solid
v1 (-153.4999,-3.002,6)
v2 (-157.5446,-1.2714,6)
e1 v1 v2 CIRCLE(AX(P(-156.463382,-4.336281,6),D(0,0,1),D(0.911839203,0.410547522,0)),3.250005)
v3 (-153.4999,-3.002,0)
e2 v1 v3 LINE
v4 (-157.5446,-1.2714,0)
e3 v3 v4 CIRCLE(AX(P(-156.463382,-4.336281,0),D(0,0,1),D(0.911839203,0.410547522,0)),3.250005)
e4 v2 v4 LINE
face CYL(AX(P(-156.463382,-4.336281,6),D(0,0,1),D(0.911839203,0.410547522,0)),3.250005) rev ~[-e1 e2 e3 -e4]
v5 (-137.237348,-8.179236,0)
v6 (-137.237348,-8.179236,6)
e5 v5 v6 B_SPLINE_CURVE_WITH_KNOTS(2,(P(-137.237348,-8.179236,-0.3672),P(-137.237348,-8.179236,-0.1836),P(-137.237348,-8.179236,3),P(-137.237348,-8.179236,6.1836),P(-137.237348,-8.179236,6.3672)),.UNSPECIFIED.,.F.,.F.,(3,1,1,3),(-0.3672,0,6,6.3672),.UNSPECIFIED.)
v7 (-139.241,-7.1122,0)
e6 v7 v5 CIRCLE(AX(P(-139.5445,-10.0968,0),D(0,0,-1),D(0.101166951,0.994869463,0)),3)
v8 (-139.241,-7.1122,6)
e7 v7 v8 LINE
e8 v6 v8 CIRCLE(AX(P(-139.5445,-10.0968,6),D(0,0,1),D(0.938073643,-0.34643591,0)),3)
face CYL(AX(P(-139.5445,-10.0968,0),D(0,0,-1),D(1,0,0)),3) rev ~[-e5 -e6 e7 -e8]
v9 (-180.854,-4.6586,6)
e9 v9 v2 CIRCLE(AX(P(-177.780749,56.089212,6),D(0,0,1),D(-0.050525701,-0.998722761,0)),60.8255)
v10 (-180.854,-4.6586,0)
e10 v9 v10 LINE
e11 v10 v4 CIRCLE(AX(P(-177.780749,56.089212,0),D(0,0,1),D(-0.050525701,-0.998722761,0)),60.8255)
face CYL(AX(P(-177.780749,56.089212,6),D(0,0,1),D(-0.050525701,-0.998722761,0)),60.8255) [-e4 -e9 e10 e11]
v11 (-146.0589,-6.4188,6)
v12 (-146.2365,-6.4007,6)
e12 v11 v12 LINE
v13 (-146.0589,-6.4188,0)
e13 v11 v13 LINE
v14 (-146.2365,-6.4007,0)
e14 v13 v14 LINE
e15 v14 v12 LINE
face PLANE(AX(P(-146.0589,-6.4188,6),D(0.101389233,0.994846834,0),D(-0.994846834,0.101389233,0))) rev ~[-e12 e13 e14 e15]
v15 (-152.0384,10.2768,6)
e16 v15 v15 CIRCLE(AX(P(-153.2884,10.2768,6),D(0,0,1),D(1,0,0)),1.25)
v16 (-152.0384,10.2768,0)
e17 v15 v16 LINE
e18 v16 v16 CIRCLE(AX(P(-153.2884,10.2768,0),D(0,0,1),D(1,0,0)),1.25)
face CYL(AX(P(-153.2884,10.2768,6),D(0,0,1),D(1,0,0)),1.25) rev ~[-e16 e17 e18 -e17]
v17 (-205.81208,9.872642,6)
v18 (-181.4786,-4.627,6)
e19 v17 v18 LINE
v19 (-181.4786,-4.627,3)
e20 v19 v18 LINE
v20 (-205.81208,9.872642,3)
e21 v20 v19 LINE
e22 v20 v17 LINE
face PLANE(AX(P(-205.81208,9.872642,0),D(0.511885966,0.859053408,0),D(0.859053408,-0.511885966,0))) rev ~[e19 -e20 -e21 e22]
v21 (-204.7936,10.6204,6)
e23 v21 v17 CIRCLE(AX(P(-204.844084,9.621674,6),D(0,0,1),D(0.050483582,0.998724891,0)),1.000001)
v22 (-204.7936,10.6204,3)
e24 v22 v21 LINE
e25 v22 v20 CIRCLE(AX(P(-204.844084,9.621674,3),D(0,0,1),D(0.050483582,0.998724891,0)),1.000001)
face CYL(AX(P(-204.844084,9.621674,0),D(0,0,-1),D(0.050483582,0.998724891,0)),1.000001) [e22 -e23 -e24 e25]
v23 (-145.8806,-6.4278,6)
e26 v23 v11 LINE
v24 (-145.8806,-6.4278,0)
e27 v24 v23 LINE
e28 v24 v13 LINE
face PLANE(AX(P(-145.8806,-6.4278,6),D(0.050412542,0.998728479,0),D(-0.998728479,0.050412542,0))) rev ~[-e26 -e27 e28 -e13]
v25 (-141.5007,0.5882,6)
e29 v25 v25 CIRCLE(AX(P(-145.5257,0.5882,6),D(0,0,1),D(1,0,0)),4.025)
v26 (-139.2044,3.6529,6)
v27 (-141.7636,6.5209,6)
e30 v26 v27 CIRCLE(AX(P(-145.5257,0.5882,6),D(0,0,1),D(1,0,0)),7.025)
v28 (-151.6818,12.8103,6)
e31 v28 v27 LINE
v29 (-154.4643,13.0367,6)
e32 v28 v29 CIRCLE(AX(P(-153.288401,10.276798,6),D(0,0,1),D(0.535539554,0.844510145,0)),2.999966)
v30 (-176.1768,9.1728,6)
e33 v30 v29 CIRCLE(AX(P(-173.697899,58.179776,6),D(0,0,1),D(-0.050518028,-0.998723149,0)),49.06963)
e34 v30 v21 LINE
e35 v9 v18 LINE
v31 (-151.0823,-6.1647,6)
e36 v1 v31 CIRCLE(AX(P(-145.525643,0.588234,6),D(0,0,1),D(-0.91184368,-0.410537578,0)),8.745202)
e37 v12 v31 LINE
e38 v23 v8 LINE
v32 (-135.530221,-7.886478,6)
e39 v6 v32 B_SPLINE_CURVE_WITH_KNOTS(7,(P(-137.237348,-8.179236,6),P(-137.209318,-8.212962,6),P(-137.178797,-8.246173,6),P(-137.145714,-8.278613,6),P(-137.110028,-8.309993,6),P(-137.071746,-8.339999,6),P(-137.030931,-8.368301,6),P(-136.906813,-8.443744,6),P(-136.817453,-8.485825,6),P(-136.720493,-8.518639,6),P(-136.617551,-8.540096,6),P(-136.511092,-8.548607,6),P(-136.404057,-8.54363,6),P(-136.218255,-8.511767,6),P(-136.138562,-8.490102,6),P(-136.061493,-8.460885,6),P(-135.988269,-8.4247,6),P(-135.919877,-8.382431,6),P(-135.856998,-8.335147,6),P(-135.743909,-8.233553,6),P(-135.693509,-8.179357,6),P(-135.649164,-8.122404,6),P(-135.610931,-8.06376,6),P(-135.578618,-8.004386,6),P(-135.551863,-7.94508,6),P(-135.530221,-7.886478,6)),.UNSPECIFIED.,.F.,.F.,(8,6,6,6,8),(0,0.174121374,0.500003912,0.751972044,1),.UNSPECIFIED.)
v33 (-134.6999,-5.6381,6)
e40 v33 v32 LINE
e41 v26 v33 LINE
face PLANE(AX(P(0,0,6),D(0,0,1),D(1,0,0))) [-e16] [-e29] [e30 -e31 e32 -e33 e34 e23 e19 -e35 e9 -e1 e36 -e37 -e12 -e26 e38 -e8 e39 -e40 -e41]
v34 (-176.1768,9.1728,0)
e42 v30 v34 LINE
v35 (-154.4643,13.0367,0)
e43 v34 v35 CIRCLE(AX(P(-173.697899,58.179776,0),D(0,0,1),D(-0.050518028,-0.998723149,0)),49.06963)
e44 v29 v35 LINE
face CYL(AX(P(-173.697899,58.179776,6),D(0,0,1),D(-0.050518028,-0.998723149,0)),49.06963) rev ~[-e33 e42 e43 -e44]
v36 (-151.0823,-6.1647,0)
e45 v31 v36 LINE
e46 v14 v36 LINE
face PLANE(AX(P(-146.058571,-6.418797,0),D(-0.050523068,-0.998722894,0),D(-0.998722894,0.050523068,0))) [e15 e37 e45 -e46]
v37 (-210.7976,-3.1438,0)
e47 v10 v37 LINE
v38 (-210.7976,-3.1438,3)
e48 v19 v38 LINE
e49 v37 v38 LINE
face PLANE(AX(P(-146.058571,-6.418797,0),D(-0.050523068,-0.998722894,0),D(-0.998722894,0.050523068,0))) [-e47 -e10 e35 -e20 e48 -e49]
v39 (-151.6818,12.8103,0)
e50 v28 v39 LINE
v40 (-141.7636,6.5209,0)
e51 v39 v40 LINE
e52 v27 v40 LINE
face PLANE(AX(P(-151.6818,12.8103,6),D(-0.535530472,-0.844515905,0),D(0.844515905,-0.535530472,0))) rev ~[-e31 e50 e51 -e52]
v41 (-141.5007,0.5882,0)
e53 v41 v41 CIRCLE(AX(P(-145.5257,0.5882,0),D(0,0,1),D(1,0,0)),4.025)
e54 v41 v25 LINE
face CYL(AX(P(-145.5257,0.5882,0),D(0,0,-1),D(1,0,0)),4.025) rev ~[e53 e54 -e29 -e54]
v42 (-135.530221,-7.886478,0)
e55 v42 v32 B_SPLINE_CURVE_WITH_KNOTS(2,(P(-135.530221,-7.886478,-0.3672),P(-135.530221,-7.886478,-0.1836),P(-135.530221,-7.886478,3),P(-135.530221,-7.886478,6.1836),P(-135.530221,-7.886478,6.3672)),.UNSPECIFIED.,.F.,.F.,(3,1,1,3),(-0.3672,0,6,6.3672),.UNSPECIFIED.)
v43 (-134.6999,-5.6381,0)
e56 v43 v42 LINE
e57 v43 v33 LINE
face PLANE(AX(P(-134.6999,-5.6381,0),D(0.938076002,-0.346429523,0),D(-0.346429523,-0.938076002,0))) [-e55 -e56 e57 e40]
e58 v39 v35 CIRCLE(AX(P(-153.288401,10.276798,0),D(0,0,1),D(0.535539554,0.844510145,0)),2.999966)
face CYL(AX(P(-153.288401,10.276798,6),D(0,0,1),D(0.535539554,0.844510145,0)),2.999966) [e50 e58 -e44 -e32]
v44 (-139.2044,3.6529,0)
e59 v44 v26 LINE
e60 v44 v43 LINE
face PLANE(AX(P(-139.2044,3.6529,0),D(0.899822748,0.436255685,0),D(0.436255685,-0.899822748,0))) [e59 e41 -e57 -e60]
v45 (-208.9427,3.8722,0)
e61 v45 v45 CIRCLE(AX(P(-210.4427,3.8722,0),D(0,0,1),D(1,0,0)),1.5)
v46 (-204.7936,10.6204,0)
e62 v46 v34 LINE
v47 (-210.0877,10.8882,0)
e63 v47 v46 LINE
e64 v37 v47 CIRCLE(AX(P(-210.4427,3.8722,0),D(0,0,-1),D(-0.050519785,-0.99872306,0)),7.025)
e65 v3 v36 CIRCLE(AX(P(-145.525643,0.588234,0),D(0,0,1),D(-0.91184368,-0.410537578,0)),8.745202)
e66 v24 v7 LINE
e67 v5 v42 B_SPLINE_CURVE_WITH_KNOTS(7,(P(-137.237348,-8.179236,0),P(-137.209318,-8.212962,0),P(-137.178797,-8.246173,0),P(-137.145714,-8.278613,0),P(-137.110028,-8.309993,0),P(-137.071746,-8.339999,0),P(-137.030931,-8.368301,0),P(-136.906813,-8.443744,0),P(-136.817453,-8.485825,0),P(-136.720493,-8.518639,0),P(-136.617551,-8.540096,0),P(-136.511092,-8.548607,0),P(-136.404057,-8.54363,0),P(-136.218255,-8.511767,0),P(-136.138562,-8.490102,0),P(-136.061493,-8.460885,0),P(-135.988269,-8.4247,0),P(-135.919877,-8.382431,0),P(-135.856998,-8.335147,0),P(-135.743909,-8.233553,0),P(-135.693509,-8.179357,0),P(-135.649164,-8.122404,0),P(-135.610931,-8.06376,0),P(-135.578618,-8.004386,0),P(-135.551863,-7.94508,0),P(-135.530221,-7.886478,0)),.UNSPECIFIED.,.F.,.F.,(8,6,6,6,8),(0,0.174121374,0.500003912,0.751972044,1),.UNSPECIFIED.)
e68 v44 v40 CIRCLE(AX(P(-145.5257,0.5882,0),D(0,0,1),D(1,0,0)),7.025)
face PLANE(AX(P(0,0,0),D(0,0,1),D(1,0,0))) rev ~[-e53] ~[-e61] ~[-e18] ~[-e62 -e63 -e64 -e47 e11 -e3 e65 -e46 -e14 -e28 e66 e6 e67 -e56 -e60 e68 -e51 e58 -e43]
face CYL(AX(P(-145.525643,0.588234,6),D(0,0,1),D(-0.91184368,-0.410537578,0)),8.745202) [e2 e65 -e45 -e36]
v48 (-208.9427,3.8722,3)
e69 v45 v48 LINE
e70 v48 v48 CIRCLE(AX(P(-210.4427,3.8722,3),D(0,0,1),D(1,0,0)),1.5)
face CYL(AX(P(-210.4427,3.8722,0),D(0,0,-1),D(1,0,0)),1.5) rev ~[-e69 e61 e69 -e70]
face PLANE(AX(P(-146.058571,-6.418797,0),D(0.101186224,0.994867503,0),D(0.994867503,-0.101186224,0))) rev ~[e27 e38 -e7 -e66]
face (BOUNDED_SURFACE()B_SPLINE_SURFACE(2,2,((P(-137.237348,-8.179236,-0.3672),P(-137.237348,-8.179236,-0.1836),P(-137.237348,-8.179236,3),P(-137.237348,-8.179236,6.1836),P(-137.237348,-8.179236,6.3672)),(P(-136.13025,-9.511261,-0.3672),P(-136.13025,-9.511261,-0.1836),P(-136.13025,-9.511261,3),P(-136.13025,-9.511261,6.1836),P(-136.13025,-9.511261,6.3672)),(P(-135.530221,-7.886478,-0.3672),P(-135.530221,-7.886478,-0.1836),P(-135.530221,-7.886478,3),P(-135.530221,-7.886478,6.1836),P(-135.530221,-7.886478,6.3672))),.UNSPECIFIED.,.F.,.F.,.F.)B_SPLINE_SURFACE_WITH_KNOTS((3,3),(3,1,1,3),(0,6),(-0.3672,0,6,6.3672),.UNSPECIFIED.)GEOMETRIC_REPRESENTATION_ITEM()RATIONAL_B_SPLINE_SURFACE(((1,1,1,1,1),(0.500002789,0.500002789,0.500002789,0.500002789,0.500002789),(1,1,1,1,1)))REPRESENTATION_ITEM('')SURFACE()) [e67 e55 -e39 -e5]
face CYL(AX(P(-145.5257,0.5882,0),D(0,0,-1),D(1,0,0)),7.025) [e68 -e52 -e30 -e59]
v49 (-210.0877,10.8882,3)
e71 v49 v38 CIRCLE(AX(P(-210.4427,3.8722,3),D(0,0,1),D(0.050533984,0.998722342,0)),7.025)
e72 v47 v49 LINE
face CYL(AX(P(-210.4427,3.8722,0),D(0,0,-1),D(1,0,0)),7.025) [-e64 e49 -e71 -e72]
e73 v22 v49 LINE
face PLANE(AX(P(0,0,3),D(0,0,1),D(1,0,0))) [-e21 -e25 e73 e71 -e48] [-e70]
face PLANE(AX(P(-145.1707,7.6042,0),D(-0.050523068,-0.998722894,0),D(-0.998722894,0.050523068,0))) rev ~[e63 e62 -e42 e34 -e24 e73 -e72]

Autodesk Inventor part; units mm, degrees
ref_plane "YZ Plane" through (0, 0, 0) normal (1, 0, 0) x (0, 1, 0)
ref_plane "XZ Plane" through (0, 0, 0) normal (0, 1, 0) x (-1, 0, 0)
ref_plane "XY Plane" through (0, 0, 0) normal (0, 0, 1) x (1, 0, 0)
sketch "スケッチ1" plane through (0, 0, 0) normal (0, 0, 1) x (1, 0, 0)
  circle A0 centre (-145.5257, 0.5882) radius 1.5
  circle A1 centre (-139.5445, -10.0968) radius 1.5
  circle A2 centre (-105.5257, -16.4118) radius 30.1 construction
  line L0 (-170.915, -81.4118) -> (490.0044, -81.4118)
  circle A3 centre (-145.5257, 0.5882) radius 4.025
  circle A4 centre (-139.5445, -10.0968) radius 3
  circle A5 centre (-145.5257, 0.5882) radius 7.025
  line L1 (-146.2365, -6.4007) -> (-139.241, -7.1122)
  line L2 (-139.2044, 3.6529) -> (-134.6999, -5.6381)
  line L3 (-134.6999, -5.6381) -> (-136.7303, -11.1361)
  circle A6 centre (-105.5257, -16.4118) radius 31.1 construction
  line L4 (-145.1707, 7.6042) -> (-210.0877, 10.8882)
  line L5 (-145.8806, -6.4278) -> (-210.7976, -3.1438)
  circle A7 centre (-210.4427, 3.8722) radius 1.5
  circle A8 centre (-210.4427, 3.8722) radius 4.025
  circle A9 centre (-210.4427, 3.8722) radius 7.025
  circle A10 centre (-210.4427, 3.8722) radius 7.525
  line L6 (-206.5907, 10.3366) -> (-181.4786, -4.627)
  circle A11 centre (-199.4194, 13.3524) radius 1.25
  arc A12 (-199.5709, 10.3562) -> (-202.1936, 14.494) centre (-199.4194, 13.3524) ccw
  line L7 (-202.1936, 14.494) -> (-247.2482, 16.7732)
  arc A13 (-289.8377, 39.1951) -> (-247.2482, 16.7732) centre (-244.3571, 73.9244) ccw
  arc A14 (-289.8377, 39.1951) -> (-291.5649, 38.2266) centre (-290.6325, 38.5882) ccw
  arc A15 (-291.5649, 38.2266) -> (-251.8636, 4.9117) centre (-241.4172, 57.674) ccw
  line L8 (-251.8636, 4.9117) -> (-211.807, -3.019)
  line L9 (-209.3045, 11.3106) -> (-204.7936, 10.6204)
  arc A16 (-204.7936, 10.6204) -> (-205.5417, 8.9052) centre (-204.8441, 9.6217) ccw
  line L10 (-210.5022, 11.397) -> (-238.3358, 2.2334)
  point P0 (0, 0)
  point P1 (0, 0)
  point P2 (-146.0589, -6.4188)
  point P3 (-205.8121, 9.8726)
  dimension "d0" = 6
  dimension "d1" = 8.05
  dimension "d2" = 3
  dimension "d3" = 1
  dimension "d4" = 3
  dimension "d5" = 8.05
  dimension "d6" = 3
  dimension "d7" = 0.5
  dimension "d8" = 2.5
  dimension "d9" = 6
  dimension "d10" = 2
  dimension "d11" = 120
  dimension "d12" = 4
  dimension "d13" = 150
  dimension "d14" = 1
  dimension "d15" = 65
  dimension "d16" = 87.382
extrude "押し出し1" add sketch "スケッチ1" along normal blind 6 contours A4 L1 L5 A5 L2 L3 | L5 L6 A16 L4 A5 L1 | A5
extrude "押し出し2" add sketch "スケッチ1" along normal blind 3 contours L5 A10 A16 L6 | L5 A9 A16 A10 | A16 A10 L6 | L6 A10 L4 A16 | A9 | A10 A16 A9 L4 | A8
fillet "フィレット1" radius 1 1 edges at (-136.7303, -11.1361, 3)
sketch "スケッチ2" plane through (0, 0, 6) normal (0, 0, 1) x (1, 0, 0)
  line L0 (-210.7976, -3.1438) -> (-181.4786, -4.627) projected
  line L1 (-205.8121, 9.8726) -> (-181.4786, -4.627) projected
  arc A0 (-204.7936, 10.6204) -> (-205.8121, 9.8726) centre (-204.8441, 9.6217) ccw projected
  line L2 (-204.7936, 10.6204) -> (-210.0877, 10.8882) projected
  arc A1 (-210.0877, 10.8882) -> (-210.7976, -3.1438) centre (-210.4427, 3.8722) ccw projected
  circle A2 centre (-210.4427, 3.8722) radius 1.5 projected
  arc A3 (-137.2374, -8.1793) -> (-135.5302, -7.8865) centre (-136.4683, -7.5401) ccw projected
  line L3 (-135.5302, -7.8865) -> (-134.6999, -5.6381) projected
  line L4 (-134.6999, -5.6381) -> (-139.2044, 3.6529) projected
  arc A4 (-139.2044, 3.6529) -> (-145.1707, 7.6042) centre (-145.5257, 0.5882) ccw projected
  line L5 (-145.1707, 7.6042) -> (-204.7936, 10.6204) projected
  arc A5 (-204.7936, 10.6204) -> (-205.8121, 9.8726) centre (-204.8441, 9.6217) ccw projected
  line L6 (-205.8121, 9.8726) -> (-181.4786, -4.627) projected
  line L7 (-181.4786, -4.627) -> (-146.0589, -6.4188) projected
  line L8 (-146.0589, -6.4188) -> (-146.2365, -6.4007) projected
  arc A6 (-146.2365, -6.4007) -> (-145.8806, -6.4278) centre (-145.5257, 0.5882) ccw projected
  line L9 (-145.8806, -6.4278) -> (-146.0589, -6.4188) projected
  line L10 (-146.0589, -6.4188) -> (-139.241, -7.1122) projected
  arc A7 (-137.2374, -8.1793) -> (-139.241, -7.1122) centre (-139.5445, -10.0968) ccw projected
  circle A8 centre (-145.5257, 0.5882) radius 4.025 projected
  arc A9 (-204.7936, 10.6204) -> (-205.8121, 9.8726) centre (-204.8441, 9.6217) ccw projected
  line L11 (-204.6925, 12.6179) -> (-209.9867, 12.8857)
  arc A10 (-209.9867, 12.8857) -> (-210.8986, -5.1413) centre (-210.4427, 3.8722) ccw
  arc A11 (-182.0757, -6.5994) -> (-181.4786, -4.627) centre (-182.022, -5.539) ccw
  line L12 (-210.8986, -5.1413) -> (-182.0757, -6.5994)
  arc A12 (-204.7936, 10.6204) -> (-204.6925, 12.6179) centre (-204.743, 11.6191) ccw
  point P0 (0, 0)
  dimension "d22" = 2
sketch "スケッチ3" plane through (0, 0, 6) normal (0, 0, 1) x (1, 0, 0)
  arc A0 (-137.2374, -8.1793) -> (-135.5302, -7.8865) centre (-136.4683, -7.5401) ccw projected
  line L0 (-135.5302, -7.8865) -> (-134.6999, -5.6381) projected
  line L1 (-134.6999, -5.6381) -> (-139.2044, 3.6529) projected
  arc A1 (-139.2044, 3.6529) -> (-145.1707, 7.6042) centre (-145.5257, 0.5882) ccw projected
  line L2 (-145.1707, 7.6042) -> (-204.7936, 10.6204) projected
  arc A2 (-204.7936, 10.6204) -> (-205.8121, 9.8726) centre (-204.8441, 9.6217) ccw projected
  line L3 (-205.8121, 9.8726) -> (-181.4786, -4.627) projected
  line L4 (-181.4786, -4.627) -> (-146.0589, -6.4188) projected
  line L5 (-146.0589, -6.4188) -> (-146.2365, -6.4007) projected
  arc A3 (-146.2365, -6.4007) -> (-145.8806, -6.4278) centre (-145.5257, 0.5882) ccw projected
  line L6 (-145.8806, -6.4278) -> (-146.0589, -6.4188) projected
  line L7 (-146.0589, -6.4188) -> (-139.241, -7.1122) projected
  arc A4 (-137.2374, -8.1793) -> (-139.241, -7.1122) centre (-139.5445, -10.0968) ccw projected
  circle A5 centre (-145.5257, 0.5882) radius 4.025 projected
  point P0 (0, 0)
extrude "押し出し3" add sketch "スケッチ3" against normal blind 6 contours L5 A3 L6
sketch "スケッチ4" plane through (0, 0, 6) normal (0, 0, 1) x (1, 0, 0)
  line L0 (-146.0589, -6.4188) -> (-139.241, -7.1122) projected
  arc A0 (-137.2374, -8.1793) -> (-139.241, -7.1122) centre (-139.5445, -10.0968) ccw projected
  arc A1 (-137.2374, -8.1793) -> (-135.5302, -7.8865) centre (-136.4683, -7.5401) ccw projected
  line L1 (-135.5302, -7.8865) -> (-134.6999, -5.6381) projected
  line L2 (-134.6999, -5.6381) -> (-139.2044, 3.6529) projected
  arc A2 (-139.2044, 3.6529) -> (-145.1707, 7.6042) centre (-145.5257, 0.5882) ccw projected
  line L3 (-145.1707, 7.6042) -> (-204.7936, 10.6204) projected
  arc A3 (-204.7936, 10.6204) -> (-205.8121, 9.8726) centre (-204.8441, 9.6217) ccw projected
  line L4 (-205.8121, 9.8726) -> (-181.4786, -4.627) projected
  line L5 (-181.4786, -4.627) -> (-146.0589, -6.4188) projected
  circle A4 centre (-145.5257, 0.5882) radius 4.025 projected
  arc A5 (-153.4999, -3.002) -> (-157.5446, -1.2714) centre (-156.4634, -4.3363) ccw
  arc A6 (-180.854, -4.6586) -> (-157.5446, -1.2714) centre (-177.7808, 56.0903) ccw
  line L6 (-181.4786, -4.627) -> (-146.0589, -6.4188) projected
  circle A7 centre (-139.5445, -10.0968) radius 3 projected
  arc A8 (-153.4999, -3.002) -> (-151.0823, -6.1647) centre (-145.5257, 0.5882) ccw
  line L7 (-145.1707, 7.6042) -> (-204.7936, 10.6204) projected
  arc A9 (-176.1768, 9.1728) -> (-154.4643, 13.0367) centre (-173.6978, 58.1782) ccw
  arc A10 (-151.6818, 12.8103) -> (-154.4643, 13.0367) centre (-153.2884, 10.2768) ccw
  line L8 (-151.6818, 12.8103) -> (-141.7636, 6.5209)
  circle A11 centre (-153.2884, 10.2768) radius 1.25
  circle A12 centre (-139.5445, -10.0968) radius 3.5
  point P0 (0, 0)
  point P1 (-176.1768, 9.1728)
  dimension "d25" = 3.25
  dimension "d26" = 95
  dimension "d27" = 3
  dimension "d28" = 2.5
  dimension "d29" = 0.5
extrude "押し出し4" cut sketch "スケッチ4" against normal blind 6 contours L5 A6 A5 A8
extrude "押し出し5" add sketch "スケッチ4" against normal blind 6 contours A2 L3 A9 A10 L8
sketch "スケッチ5" plane through (0, 0, 6) normal (0, 0, 1) x (1, 0, 0)
  circle A0 centre (-153.2884, 10.2768) radius 1.25 projected
  circle A1 centre (-145.5257, 0.5882) radius 4.025 projected
  arc A2 (-180.854, -4.6586) -> (-157.5446, -1.2714) centre (-177.7808, 56.0903) ccw projected
  arc A3 (-153.4999, -3.002) -> (-157.5446, -1.2714) centre (-156.4634, -4.3363) ccw projected
  arc A4 (-153.4999, -3.002) -> (-151.0823, -6.1647) centre (-145.5257, 0.5882) ccw projected
  line L0 (-151.0823, -6.1647) -> (-146.0589, -6.4188) projected
  line L1 (-146.0589, -6.4188) -> (-139.241, -7.1122) projected
  arc A5 (-137.2374, -8.1793) -> (-139.241, -7.1122) centre (-139.5445, -10.0968) ccw projected
  arc A6 (-137.2374, -8.1793) -> (-135.5302, -7.8865) centre (-136.4683, -7.5401) ccw projected
  line L2 (-135.5302, -7.8865) -> (-134.6999, -5.6381) projected
  line L3 (-134.6999, -5.6381) -> (-139.2044, 3.6529) projected
  arc A7 (-139.2044, 3.6529) -> (-141.7636, 6.5209) centre (-145.5257, 0.5882) ccw projected
  line L4 (-141.7636, 6.5209) -> (-151.6818, 12.8103) projected
  arc A8 (-151.6818, 12.8103) -> (-154.4643, 13.0367) centre (-153.2884, 10.2768) ccw projected
  arc A9 (-176.1768, 9.1728) -> (-154.4643, 13.0367) centre (-173.6978, 58.1782) ccw projected
  line L5 (-176.1768, 9.1728) -> (-204.7936, 10.6204) projected
  arc A10 (-204.7936, 10.6204) -> (-205.8121, 9.8726) centre (-204.8441, 9.6217) ccw projected
  line L6 (-205.8121, 9.8726) -> (-181.4786, -4.627) projected
  line L7 (-181.4786, -4.627) -> (-180.854, -4.6586) projected
  line L8 (-204.7936, 10.6204) -> (-210.0877, 10.8882) projected
  arc A11 (-210.0877, 10.8882) -> (-210.7976, -3.1438) centre (-210.4427, 3.8722) ccw projected
  line L9 (-210.7976, -3.1438) -> (-181.4786, -4.627) projected
  line L10 (-205.8121, 9.8726) -> (-181.4786, -4.627) projected
  arc A12 (-204.7936, 10.6204) -> (-205.8121, 9.8726) centre (-204.8441, 9.6217) ccw projected
  circle A13 centre (-210.4427, 3.8722) radius 1.5 projected
  arc A14 (-204.7936, 10.6204) -> (-205.8121, 9.8726) centre (-204.8441, 9.6217) ccw projected
  arc A15 (-204.7936, 10.6204) -> (-204.6925, 12.6179) centre (-204.743, 11.6191) ccw
  line L11 (-204.6925, 12.6179) -> (-209.9867, 12.8857)
  arc A16 (-209.9867, 12.8857) -> (-210.8986, -5.1413) centre (-210.4427, 3.8722) ccw
  line L12 (-210.8986, -5.1413) -> (-182.0757, -6.5994)
  arc A17 (-182.0757, -6.5994) -> (-181.4786, -4.627) centre (-182.022, -5.539) ccw
  line L13 (-205.8121, 9.8726) -> (-181.4786, -4.627) projected
  point P0 (0, 0)
  dimension "d34" = 2
properties part number "後ろウイング根本" material "ポリカーボネート、クリア"
